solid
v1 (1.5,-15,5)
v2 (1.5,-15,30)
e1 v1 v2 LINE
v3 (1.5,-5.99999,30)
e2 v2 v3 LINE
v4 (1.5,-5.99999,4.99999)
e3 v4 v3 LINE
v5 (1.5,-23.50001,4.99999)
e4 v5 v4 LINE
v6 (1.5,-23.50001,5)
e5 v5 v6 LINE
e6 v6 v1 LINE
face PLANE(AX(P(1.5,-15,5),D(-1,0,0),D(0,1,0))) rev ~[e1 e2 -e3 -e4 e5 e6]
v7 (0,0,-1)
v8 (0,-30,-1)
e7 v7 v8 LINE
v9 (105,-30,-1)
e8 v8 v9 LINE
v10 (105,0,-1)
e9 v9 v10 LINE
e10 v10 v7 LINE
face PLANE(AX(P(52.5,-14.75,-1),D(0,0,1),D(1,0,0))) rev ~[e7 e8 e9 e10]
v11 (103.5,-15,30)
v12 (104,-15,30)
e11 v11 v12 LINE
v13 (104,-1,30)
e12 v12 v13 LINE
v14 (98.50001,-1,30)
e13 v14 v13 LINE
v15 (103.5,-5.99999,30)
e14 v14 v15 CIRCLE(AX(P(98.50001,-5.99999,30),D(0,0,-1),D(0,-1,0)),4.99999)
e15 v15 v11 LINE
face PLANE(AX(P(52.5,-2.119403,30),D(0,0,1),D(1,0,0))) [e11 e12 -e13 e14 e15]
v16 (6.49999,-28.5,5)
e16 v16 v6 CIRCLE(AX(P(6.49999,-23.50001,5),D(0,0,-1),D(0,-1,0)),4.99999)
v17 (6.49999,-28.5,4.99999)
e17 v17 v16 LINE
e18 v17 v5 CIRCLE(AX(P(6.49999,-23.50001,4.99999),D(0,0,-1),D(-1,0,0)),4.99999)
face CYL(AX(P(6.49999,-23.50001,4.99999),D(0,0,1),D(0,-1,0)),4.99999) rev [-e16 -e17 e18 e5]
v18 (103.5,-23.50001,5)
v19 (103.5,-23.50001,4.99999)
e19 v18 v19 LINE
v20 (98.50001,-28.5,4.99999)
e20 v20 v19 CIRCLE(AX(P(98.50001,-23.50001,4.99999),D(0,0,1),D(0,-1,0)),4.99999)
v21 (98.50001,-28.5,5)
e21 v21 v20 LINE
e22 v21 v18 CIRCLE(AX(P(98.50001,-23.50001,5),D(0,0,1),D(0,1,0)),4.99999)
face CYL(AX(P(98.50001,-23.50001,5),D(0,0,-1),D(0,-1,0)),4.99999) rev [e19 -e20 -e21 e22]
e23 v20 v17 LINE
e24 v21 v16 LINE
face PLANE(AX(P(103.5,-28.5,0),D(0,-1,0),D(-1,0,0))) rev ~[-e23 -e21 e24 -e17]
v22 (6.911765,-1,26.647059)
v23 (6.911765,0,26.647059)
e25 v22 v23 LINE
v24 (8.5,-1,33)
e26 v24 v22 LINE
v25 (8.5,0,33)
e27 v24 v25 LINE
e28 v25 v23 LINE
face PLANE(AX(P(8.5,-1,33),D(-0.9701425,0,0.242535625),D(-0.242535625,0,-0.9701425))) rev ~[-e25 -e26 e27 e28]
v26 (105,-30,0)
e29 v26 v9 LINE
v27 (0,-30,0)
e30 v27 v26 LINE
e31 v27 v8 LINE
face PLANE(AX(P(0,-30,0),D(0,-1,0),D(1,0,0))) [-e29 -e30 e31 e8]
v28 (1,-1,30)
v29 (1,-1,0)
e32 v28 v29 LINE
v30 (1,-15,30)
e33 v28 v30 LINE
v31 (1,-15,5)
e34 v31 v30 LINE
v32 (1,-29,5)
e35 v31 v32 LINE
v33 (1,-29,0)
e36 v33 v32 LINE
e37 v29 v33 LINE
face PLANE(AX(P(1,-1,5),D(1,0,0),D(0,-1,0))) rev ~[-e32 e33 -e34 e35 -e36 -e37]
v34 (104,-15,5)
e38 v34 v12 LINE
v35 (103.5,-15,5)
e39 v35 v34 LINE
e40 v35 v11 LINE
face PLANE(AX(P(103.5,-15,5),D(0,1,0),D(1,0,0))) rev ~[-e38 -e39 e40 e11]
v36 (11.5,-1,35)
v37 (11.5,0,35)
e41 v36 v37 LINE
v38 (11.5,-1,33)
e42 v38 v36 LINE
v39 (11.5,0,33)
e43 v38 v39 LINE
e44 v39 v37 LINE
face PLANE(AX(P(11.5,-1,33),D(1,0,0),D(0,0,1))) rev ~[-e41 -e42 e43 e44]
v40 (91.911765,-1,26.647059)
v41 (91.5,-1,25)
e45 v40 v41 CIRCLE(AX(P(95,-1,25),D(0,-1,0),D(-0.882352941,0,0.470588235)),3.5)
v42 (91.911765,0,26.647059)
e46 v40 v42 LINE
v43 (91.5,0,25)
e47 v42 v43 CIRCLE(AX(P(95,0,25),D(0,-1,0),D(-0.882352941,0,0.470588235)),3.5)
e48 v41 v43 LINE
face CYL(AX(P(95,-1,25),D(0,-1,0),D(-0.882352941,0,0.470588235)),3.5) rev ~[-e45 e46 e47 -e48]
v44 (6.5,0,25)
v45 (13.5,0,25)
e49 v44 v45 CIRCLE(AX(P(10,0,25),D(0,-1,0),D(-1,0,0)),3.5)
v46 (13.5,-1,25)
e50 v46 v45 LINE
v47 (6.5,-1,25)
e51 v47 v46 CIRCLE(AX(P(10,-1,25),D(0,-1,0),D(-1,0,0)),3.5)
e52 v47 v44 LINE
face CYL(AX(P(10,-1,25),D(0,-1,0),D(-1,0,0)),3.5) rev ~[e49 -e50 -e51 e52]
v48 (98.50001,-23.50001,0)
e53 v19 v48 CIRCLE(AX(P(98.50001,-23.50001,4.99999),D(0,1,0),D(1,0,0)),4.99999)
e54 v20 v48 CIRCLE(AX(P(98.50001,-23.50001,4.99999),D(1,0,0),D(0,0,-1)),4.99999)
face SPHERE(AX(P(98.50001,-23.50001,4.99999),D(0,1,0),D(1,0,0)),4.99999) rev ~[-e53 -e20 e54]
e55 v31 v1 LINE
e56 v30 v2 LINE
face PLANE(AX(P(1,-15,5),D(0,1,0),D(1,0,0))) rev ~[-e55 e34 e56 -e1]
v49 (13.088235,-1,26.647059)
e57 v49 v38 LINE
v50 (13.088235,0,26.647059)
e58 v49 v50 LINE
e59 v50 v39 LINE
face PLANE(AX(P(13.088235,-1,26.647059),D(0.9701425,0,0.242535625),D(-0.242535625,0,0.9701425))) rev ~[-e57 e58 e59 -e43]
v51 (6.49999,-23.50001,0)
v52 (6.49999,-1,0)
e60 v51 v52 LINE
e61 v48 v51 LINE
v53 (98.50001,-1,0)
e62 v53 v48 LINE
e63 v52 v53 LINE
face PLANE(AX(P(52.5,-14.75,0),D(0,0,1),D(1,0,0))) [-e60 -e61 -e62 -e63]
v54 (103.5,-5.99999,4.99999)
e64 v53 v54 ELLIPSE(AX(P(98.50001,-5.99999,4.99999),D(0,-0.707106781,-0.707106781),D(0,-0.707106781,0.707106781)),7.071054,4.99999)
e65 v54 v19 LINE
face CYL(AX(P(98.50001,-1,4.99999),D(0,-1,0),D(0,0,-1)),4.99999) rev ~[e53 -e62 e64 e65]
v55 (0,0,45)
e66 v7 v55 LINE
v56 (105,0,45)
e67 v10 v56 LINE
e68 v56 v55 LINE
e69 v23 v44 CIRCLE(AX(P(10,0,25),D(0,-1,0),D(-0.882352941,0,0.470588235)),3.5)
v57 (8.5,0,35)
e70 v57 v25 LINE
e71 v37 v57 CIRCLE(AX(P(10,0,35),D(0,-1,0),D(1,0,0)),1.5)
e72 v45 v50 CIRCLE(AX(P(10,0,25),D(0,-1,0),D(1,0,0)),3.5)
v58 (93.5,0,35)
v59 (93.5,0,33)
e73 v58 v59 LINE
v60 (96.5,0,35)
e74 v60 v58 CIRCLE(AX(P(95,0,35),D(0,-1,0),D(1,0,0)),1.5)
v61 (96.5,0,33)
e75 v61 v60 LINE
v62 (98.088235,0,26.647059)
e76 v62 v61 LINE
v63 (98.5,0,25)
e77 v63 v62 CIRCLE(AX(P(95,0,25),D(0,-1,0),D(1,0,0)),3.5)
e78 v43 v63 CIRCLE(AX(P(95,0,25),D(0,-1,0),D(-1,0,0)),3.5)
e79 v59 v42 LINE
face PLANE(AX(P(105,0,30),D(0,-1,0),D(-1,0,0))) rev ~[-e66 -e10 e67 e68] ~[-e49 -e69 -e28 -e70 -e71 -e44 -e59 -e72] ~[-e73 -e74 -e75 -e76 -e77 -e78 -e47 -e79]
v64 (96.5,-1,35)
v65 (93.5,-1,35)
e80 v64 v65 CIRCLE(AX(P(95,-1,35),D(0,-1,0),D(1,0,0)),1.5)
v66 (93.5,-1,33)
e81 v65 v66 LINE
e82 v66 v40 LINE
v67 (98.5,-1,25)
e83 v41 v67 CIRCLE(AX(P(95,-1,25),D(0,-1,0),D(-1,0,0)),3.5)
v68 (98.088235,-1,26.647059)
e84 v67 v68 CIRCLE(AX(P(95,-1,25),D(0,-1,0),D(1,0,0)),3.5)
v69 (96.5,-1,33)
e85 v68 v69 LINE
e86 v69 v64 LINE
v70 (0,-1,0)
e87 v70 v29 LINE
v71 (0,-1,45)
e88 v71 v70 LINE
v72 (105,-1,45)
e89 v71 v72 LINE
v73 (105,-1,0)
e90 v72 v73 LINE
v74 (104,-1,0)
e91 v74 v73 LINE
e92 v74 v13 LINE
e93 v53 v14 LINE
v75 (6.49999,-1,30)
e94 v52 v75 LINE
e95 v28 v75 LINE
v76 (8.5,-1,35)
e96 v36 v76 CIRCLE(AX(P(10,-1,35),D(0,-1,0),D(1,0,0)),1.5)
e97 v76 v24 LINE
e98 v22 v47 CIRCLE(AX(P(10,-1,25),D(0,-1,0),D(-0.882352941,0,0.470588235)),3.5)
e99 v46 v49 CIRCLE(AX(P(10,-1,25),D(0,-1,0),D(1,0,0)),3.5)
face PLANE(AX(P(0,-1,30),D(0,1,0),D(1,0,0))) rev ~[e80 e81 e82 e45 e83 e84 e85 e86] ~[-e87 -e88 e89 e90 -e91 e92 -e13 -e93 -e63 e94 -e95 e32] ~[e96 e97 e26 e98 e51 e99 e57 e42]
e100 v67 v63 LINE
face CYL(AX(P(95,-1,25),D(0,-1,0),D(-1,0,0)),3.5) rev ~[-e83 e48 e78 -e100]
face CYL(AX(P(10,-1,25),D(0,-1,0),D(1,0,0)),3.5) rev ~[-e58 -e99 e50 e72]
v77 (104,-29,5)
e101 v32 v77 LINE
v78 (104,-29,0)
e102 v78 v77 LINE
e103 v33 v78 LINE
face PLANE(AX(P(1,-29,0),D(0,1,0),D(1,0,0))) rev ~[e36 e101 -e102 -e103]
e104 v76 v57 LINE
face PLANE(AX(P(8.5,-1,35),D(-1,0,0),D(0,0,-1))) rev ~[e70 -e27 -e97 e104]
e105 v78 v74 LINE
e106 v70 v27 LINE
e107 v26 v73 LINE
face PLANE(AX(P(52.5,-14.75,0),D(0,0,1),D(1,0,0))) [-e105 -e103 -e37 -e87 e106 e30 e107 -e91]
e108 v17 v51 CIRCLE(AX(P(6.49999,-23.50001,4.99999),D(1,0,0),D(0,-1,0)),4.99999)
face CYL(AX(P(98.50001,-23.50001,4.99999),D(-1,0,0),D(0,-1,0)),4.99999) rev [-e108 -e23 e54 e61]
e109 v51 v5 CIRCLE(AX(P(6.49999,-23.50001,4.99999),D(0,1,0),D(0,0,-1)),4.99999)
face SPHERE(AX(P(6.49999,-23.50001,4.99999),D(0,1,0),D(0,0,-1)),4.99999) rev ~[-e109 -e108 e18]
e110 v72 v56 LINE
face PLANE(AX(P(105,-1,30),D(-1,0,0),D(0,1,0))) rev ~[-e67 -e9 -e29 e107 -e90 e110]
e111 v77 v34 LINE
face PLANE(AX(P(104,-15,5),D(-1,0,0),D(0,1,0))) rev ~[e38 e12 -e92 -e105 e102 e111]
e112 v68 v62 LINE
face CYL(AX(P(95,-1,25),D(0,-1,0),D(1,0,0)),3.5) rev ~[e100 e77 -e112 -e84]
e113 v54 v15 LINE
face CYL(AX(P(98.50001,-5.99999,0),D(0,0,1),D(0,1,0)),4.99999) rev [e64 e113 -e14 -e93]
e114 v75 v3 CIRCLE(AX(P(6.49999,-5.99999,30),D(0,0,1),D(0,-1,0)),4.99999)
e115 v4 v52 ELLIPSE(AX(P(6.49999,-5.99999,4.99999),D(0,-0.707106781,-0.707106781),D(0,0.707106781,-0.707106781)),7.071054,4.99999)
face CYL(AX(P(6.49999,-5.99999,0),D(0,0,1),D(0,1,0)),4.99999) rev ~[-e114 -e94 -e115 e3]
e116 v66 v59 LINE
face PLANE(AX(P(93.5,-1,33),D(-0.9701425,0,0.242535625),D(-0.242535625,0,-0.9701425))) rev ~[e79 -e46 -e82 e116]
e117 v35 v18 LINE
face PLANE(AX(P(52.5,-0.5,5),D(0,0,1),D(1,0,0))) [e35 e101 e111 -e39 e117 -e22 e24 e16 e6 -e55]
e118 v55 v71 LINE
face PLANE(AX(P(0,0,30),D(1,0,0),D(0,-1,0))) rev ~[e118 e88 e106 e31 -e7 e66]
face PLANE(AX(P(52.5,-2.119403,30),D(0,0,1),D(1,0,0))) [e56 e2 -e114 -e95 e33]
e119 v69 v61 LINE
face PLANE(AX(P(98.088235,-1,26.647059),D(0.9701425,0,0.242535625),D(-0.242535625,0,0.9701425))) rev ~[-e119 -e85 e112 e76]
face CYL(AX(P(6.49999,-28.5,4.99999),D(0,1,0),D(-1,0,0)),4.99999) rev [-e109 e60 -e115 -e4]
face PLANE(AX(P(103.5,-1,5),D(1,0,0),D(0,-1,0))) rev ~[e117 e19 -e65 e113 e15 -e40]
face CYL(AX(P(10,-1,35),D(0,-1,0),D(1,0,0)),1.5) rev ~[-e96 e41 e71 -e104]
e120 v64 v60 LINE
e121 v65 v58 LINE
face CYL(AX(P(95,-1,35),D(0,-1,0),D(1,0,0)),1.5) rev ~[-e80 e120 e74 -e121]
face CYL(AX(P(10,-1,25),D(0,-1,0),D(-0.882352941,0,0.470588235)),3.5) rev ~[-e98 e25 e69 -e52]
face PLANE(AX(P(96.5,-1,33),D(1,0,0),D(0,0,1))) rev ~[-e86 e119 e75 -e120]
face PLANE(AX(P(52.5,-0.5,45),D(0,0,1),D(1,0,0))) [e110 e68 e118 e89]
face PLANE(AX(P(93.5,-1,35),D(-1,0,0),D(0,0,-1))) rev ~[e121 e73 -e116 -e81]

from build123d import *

# Parameters (mm, degrees)
F0_W     = 102
F0_H     = 27.5
F1_DEPTH = 1
F2_DEPTH = 5
F4_DEPTH = 25
F6_DEPTH = 15
F8_DEPTH = 1
F9_R     = 4.99999
F10_R    = 4.99999


# Not quite as in the source:
# - a fillet or chamfer is up to 0.001 mm smaller than in the source, because OpenCascade refuses the exact size
# - a feature names something its author has since deleted; it is built from what else it names


with BuildPart() as f1:
    # F0 (on Top) → F1 (new body)
    with BuildSketch(Plane.XY):
        with Locations((52.5, -14.75)):
            Rectangle(F0_W, F0_H)
        Polygon((1.5, -1), (1, -1), (1, -29), (104, -29), (104, -1), (103.5, -1), (103.5, -28.5), (1.5, -28.5), align=None)
        Polygon((1, -1), (0, -1), (0, -30), (105, -30), (105, -1), (104, -1), (104, -29), (1, -29), align=None)
        Polygon((105, 0), (0, 0), (0, -1), (1, -1), (1.5, -1), (103.5, -1), (104, -1), (105, -1), align=None)
    extrude(amount=-F1_DEPTH)

    # F0 (on Top) → F2 (join)
    with BuildSketch(Plane.XY):
        Polygon((105, 0), (0, 0), (0, -1), (1, -1), (1.5, -1), (103.5, -1), (104, -1), (105, -1), align=None)
        Polygon((1.5, -1), (1, -1), (1, -29), (104, -29), (104, -1), (103.5, -1), (103.5, -28.5), (1.5, -28.5), align=None)
    extrude(amount=F2_DEPTH)

    # F3 (on face) → F4 (join)
    with BuildSketch(Plane.XY.offset(5)):
        Polygon((1, -1), (1, -15), (1.5, -15), (1.5, -1), (103.5, -1), (103.5, -15), (104, -15), (104, -1), (105, -1), (105, 0), (0, 0), (0, -1), align=None)
    extrude(amount=F4_DEPTH)

    # F5 (on face) → F6 (join)
    with BuildSketch(Plane.XY.offset(30)):
        Polygon((1.5, -1), (103.5, -1), (104, -1), (105, -1), (105, 0), (0, 0), (0, -1), (1, -1), align=None)
    extrude(amount=F6_DEPTH)

    # F7 (on face) → F8 (cut, through all)
    with BuildSketch(Plane.XZ.offset(1)):
        with BuildLine():
            Line((13.5, 25), (6.5, 25))
            ThreePointArc((6.5, 25), (10, 21.5), (13.5, 25))
        make_face()
        with BuildLine():
            ThreePointArc((6.9117647059, 26.6470588235), (6.6045012495, 25.8488746876), (6.5, 25))
            Line((6.5, 25), (6.9117647059, 26.6470588235))
        make_face()
        with BuildLine():
            Line((6.9117647059, 26.6470588235), (6.5, 25))
            Line((6.5, 25), (13.5, 25))
            Line((13.5, 25), (13.0882352941, 26.6470588235))
            ThreePointArc((13.0882352941, 26.6470588235), (10, 28.5), (6.9117647059, 26.6470588235))
        make_face()
        with BuildLine():
            Line((13.0882352941, 26.6470588235), (13.5, 25))
            ThreePointArc((13.5, 25), (13.3954987505, 25.8488746876), (13.0882352941, 26.6470588235))
        make_face()
        with BuildLine():
            Line((8.5, 33), (6.9117647059, 26.6470588235))
            ThreePointArc((6.9117647059, 26.6470588235), (10, 28.5), (13.0882352941, 26.6470588235))
            Line((13.0882352941, 26.6470588235), (11.5, 33))
            ThreePointArc((11.5, 33), (10, 31.5), (8.5, 33))
        make_face()
        with BuildLine():
            ThreePointArc((8.8819660113, 34), (8.5987414616, 33.5352331347), (8.5, 33))
            ThreePointArc((8.5, 33), (10, 31.5), (11.5, 33))
            ThreePointArc((11.5, 33), (11.4012585384, 33.5352331347), (11.1180339887, 34))
            ThreePointArc((11.1180339887, 34), (10, 33.5), (8.8819660113, 34))
        make_face()
        with BuildLine():
            Line((8.5, 35), (8.5, 33))
            ThreePointArc((8.5, 33), (8.5987414616, 33.5352331347), (8.8819660113, 34))
            ThreePointArc((8.8819660113, 34), (8.5987414616, 34.4647668653), (8.5, 35))
        make_face()
        with BuildLine():
            ThreePointArc((11.1180339887, 34), (11.4012585384, 33.5352331347), (11.5, 33))
            Line((11.5, 33), (11.5, 35))
            ThreePointArc((11.5, 35), (11.4012585384, 34.4647668653), (11.1180339887, 34))
        make_face()
        with BuildLine():
            ThreePointArc((8.5, 35), (8.5987414616, 34.4647668653), (8.8819660113, 34))
            ThreePointArc((8.8819660113, 34), (10, 34.5), (11.1180339887, 34))
            ThreePointArc((11.1180339887, 34), (11.4012585384, 34.4647668653), (11.5, 35))
            Line((11.5, 35), (8.5, 35))
        make_face()
        with BuildLine():
            ThreePointArc((11.5, 35), (10, 36.5), (8.5, 35))
            Line((8.5, 35), (11.5, 35))
        make_face()
        with BuildLine():
            Line((91.9117647059, 26.6470588235), (91.5, 25))
            ThreePointArc((91.5, 25), (95, 21.5), (98.5, 25))
            Line((98.5, 25), (98.0882352941, 26.6470588235))
            ThreePointArc((98.0882352941, 26.6470588235), (95, 28.5), (91.9117647059, 26.6470588235))
        make_face()
        with BuildLine():
            ThreePointArc((91.9117647059, 26.6470588235), (91.6045012495, 25.8488746876), (91.5, 25))
            Line((91.5, 25), (91.9117647059, 26.6470588235))
        make_face()
        with BuildLine():
            Line((98.0882352941, 26.6470588235), (98.5, 25))
            ThreePointArc((98.5, 25), (98.3954987505, 25.8488746876), (98.0882352941, 26.6470588235))
        make_face()
        with BuildLine():
            Line((93.5, 33), (91.9117647059, 26.6470588235))
            ThreePointArc((91.9117647059, 26.6470588235), (95, 28.5), (98.0882352941, 26.6470588235))
            Line((98.0882352941, 26.6470588235), (96.5, 33))
            ThreePointArc((96.5, 33), (95, 31.5), (93.5, 33))
        make_face()
        with BuildLine():
            ThreePointArc((93.8819660113, 34), (93.5987414616, 33.5352331347), (93.5, 33))
            ThreePointArc((93.5, 33), (95, 31.5), (96.5, 33))
            ThreePointArc((96.5, 33), (96.4012585384, 33.5352331347), (96.1180339887, 34))
            ThreePointArc((96.1180339887, 34), (95, 33.5), (93.8819660113, 34))
        make_face()
        with BuildLine():
            Line((93.5, 35), (93.5, 33))
            ThreePointArc((93.5, 33), (93.5987414616, 33.5352331347), (93.8819660113, 34))
            ThreePointArc((93.8819660113, 34), (93.5987414616, 34.4647668653), (93.5, 35))
        make_face()
        with BuildLine():
            ThreePointArc((96.1180339887, 34), (96.4012585384, 33.5352331347), (96.5, 33))
            Line((96.5, 33), (96.5, 35))
            ThreePointArc((96.5, 35), (96.4012585384, 34.4647668653), (96.1180339887, 34))
        make_face()
        with BuildLine():
            ThreePointArc((93.5, 35), (93.5987414616, 34.4647668653), (93.8819660113, 34))
            ThreePointArc((93.8819660113, 34), (95, 34.5), (96.1180339887, 34))
            ThreePointArc((96.1180339887, 34), (96.4012585384, 34.4647668653), (96.5, 35))
            ThreePointArc((96.5, 35), (95, 36.5), (93.5, 35))
        make_face()
        with BuildLine():
            ThreePointArc((11.1180339887, 34), (10, 34.5), (8.8819660113, 34))
            ThreePointArc((8.8819660113, 34), (10, 33.5), (11.1180339887, 34))
        make_face()
        with BuildLine():
            ThreePointArc((96.1180339887, 34), (95, 34.5), (93.8819660113, 34))
            ThreePointArc((93.8819660113, 34), (95, 33.5), (96.1180339887, 34))
        make_face()
    extrude(amount=-F8_DEPTH, mode=Mode.SUBTRACT)

    # F9 (radius 5 in the source; OpenCascade refuses exactly that, so slightly less here)
    f9_edges = [f1.edges().sort_by_distance(p)[0] for p in [
        (1.5, -14.75, 0),
        (103.5, -14.75, 0),
        (103.5, -1, 15),
        (1.5, -1, 15),
    ]]
    fillet(f9_edges, radius=F9_R)

    # F10 (radius 5 in the source; OpenCascade refuses exactly that, so slightly less here)
    f10_edges = [f1.edges().sort_by_distance(p)[0] for p in [
        (52.5, -28.5, 0),
    ]]
    fillet(f10_edges, radius=F10_R)


solid = f1.part
